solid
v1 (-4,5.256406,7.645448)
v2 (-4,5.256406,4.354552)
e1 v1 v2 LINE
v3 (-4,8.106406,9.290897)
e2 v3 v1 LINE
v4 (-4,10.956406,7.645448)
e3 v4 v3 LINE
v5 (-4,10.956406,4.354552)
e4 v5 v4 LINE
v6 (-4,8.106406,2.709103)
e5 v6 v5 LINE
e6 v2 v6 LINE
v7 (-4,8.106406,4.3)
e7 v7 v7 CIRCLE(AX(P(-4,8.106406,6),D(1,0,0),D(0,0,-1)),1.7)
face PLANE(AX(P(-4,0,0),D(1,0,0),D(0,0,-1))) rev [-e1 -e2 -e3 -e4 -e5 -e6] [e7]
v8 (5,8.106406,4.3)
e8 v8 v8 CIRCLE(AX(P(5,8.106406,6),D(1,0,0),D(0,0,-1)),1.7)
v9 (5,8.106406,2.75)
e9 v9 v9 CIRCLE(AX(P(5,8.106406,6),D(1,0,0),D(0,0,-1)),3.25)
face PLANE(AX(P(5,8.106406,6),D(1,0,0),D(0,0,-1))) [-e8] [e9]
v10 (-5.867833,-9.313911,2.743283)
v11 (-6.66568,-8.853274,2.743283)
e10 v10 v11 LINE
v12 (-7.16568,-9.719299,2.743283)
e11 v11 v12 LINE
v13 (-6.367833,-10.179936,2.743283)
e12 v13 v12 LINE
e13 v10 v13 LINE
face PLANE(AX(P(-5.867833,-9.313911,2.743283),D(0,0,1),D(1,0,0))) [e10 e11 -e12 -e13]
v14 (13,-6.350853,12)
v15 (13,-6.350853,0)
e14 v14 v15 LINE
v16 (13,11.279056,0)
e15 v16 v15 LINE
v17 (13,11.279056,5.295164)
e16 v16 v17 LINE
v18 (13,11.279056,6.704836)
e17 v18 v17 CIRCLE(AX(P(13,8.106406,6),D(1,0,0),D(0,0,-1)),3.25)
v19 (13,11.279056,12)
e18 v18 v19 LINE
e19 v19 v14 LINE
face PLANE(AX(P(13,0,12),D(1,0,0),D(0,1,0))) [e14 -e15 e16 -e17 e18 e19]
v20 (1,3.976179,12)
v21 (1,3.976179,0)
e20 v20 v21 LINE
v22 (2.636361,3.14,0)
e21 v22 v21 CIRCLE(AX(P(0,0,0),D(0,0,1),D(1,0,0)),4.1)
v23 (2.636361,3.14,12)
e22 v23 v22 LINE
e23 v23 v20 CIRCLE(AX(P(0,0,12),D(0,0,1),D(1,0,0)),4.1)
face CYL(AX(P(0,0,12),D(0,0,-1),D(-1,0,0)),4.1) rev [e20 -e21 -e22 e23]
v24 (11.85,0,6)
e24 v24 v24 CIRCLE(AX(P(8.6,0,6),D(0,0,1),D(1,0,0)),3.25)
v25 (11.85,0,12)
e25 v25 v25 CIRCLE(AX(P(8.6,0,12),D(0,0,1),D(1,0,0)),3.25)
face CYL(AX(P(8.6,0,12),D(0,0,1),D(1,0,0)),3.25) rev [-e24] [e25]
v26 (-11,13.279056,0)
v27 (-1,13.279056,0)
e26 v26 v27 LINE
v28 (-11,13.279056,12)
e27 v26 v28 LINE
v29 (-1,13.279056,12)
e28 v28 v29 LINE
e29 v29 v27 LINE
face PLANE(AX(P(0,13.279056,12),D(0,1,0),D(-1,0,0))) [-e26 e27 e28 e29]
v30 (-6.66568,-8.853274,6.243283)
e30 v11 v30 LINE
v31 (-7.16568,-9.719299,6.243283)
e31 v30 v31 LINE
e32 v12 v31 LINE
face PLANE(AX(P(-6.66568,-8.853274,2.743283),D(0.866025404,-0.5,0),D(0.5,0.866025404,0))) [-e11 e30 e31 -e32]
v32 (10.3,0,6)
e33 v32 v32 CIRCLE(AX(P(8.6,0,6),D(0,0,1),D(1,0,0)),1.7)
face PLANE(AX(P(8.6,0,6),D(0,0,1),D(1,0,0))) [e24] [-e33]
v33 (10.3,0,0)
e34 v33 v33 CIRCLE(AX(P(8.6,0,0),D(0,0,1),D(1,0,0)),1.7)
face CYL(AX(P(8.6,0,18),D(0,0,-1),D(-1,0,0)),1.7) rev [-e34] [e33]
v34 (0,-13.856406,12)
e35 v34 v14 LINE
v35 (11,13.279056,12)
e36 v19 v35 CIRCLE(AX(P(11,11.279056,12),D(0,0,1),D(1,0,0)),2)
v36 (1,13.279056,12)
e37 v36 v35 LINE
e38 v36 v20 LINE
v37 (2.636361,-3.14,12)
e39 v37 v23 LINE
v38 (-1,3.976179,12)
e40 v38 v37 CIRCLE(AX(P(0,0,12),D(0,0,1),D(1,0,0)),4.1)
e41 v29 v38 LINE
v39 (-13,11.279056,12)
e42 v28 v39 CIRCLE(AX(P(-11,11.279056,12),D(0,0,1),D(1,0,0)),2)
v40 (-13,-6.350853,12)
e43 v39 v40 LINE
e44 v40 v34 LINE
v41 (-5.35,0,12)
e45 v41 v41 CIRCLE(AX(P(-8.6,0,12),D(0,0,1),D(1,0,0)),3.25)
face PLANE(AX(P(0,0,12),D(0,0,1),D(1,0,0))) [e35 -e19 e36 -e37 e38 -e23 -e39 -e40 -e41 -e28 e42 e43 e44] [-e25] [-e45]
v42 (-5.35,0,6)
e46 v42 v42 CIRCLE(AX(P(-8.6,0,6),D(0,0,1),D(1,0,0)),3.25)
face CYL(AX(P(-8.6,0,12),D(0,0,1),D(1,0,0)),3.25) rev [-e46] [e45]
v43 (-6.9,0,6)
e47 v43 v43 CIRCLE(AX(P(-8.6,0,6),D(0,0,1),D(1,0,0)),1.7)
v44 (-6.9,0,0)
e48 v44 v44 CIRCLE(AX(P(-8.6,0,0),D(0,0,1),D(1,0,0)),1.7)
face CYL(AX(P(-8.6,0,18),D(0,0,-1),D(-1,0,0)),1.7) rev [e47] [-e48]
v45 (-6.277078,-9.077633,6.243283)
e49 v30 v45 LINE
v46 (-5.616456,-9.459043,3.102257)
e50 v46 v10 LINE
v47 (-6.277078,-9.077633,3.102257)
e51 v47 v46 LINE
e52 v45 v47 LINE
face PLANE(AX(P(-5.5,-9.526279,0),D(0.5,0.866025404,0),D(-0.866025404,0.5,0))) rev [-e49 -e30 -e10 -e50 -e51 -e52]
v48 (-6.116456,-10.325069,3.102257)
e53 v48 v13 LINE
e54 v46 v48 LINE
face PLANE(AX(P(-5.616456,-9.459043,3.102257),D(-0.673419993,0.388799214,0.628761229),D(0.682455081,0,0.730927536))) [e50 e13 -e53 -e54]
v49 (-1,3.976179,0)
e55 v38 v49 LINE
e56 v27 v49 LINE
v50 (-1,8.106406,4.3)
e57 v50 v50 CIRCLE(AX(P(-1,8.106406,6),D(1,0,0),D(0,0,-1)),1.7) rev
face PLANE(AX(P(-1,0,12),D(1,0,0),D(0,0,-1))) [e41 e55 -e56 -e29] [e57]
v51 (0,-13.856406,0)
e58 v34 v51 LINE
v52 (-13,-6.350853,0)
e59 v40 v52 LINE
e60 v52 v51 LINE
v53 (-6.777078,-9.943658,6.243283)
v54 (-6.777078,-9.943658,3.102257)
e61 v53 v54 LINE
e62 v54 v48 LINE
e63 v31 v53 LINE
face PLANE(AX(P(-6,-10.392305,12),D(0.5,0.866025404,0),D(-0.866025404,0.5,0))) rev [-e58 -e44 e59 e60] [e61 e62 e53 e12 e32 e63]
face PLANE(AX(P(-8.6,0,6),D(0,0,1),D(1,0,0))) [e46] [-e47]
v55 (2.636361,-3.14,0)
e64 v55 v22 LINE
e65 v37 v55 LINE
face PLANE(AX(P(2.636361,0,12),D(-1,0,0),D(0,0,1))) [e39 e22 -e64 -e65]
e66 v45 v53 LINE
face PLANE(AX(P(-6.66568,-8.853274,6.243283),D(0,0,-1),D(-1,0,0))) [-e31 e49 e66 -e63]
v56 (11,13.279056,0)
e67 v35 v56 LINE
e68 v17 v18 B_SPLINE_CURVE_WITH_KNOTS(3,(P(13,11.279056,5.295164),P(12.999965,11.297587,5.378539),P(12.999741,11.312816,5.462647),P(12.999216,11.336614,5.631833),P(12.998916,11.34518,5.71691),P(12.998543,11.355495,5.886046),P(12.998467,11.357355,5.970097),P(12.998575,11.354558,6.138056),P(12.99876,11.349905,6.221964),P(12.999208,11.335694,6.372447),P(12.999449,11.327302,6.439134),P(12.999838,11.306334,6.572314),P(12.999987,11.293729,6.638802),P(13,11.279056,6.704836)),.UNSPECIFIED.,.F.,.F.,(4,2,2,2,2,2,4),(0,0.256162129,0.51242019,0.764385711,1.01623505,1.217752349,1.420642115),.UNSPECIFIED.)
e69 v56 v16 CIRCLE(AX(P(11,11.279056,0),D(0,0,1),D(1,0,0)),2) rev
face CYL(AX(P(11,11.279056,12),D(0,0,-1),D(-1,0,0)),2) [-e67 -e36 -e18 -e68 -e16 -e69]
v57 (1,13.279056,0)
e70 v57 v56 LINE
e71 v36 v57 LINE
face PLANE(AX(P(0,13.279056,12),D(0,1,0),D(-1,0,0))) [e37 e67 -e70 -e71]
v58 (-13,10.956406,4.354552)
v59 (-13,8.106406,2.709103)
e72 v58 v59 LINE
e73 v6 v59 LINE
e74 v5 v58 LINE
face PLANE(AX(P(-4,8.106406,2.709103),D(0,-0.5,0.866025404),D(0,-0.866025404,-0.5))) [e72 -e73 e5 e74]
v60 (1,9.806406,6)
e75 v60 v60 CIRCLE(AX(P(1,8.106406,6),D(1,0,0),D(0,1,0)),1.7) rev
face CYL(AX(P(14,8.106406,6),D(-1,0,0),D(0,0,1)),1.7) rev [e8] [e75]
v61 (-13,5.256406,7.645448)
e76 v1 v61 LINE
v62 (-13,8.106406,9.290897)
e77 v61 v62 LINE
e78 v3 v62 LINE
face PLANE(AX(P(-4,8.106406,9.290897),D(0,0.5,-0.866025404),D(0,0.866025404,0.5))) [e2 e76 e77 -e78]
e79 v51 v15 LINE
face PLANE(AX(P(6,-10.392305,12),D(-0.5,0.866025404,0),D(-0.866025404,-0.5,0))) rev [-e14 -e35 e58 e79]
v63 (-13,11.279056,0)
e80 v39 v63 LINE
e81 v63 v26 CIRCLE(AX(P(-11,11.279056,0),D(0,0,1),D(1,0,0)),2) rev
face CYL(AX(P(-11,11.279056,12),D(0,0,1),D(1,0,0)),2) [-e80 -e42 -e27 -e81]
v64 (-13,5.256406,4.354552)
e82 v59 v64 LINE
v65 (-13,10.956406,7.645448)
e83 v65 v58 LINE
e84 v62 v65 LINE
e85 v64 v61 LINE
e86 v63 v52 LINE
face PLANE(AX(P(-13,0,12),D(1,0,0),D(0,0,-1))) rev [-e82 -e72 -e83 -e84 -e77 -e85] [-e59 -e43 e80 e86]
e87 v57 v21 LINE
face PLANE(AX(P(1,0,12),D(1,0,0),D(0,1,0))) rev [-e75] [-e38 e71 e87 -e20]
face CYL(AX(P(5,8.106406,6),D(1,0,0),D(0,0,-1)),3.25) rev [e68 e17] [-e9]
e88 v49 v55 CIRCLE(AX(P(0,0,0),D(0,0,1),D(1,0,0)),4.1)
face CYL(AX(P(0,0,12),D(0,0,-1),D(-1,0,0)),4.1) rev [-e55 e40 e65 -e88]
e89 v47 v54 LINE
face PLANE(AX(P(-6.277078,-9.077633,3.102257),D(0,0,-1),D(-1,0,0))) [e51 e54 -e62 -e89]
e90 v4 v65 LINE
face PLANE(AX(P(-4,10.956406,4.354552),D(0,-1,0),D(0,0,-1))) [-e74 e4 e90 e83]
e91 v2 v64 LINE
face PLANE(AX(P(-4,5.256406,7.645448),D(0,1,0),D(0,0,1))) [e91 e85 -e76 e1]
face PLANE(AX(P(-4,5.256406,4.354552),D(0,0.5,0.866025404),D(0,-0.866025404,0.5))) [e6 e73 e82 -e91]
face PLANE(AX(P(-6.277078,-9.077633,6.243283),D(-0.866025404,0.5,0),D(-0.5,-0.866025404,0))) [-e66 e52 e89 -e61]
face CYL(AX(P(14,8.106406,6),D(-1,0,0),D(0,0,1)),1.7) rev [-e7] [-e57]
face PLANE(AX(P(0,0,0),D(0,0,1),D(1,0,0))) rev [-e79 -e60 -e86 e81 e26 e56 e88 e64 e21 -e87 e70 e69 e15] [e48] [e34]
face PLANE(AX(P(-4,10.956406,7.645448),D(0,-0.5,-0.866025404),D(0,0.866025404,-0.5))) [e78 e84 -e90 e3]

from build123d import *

# Parameters (mm, degrees)
BOSS_EXTRUDE1_DEPTH            = 12
SKETCH41_R                     = 1.7
CUT_EXTRUDE7_DEPTH             = 18
CBORE_FOR_M3_SHCS1_D           = 3.4
CBORE_FOR_M3_SHCS1_CBORE_D     = 6.5
CBORE_FOR_M3_SHCS1_CBORE_DEPTH = 3
F_3DSKETCH3_START              = 9
F_3DSKETCH3_OUTLINE_R          = 3.25
F_3DSKETCH3_OUTLINE_R_2        = 1.7
F_3DSKETCH3_DEPTH              = 3
CUT_EXTRUDE10_DEPTH            = 15
CUT_EXTRUDE10_DEPTH_BACK       = 15
SKETCH52_R                     = 1.7
SKETCH58_R                     = 3.25
CUT_EXTRUDE11_DEPTH            = 8
CUT_EXTRUDE12_DEPTH            = 4
CUT_EXTRUDE12_DEPTH_BACK       = 6
FILLET1_R                      = 2
SKETCH61_R                     = 3.25
CUT_EXTRUDE13_DEPTH            = 6
CUT_EXTRUDE14_DEPTH            = 1


# Read off the part's stored shape, not the designer's step: 3DSketch3
with BuildPart() as part:
    # Sketch1 → Boss-Extrude1 (new body)
    with BuildSketch(Plane(origin=(0, 0, 0), x_dir=(0, 1, 0), z_dir=(0, 0, 1))):
        with BuildLine():
            Line((-6.350852961, -13), (13.279056191, -13))
            Line((13.279056191, -13), (13.279056191, -1))
            Line((13.279056191, -1), (3.97617907, -1))
            ThreePointArc((3.97617907, -1), (3.650947901, -1.865631106), (3.14, -2.636361129))
            Line((3.14, -2.636361129), (-3.14, -2.636361129))
            ThreePointArc((-3.14, -2.636361129), (-3.852531635, -1.402854233), (-4.1, 0))
            ThreePointArc((-4.1, 0), (-0.503818326, 4.06892702), (3.97617907, 1))
            Line((3.97617907, 1), (13.279056191, 1))
            Line((13.279056191, 1), (13.279056191, 13))
            Line((13.279056191, 13), (-6.350852961, 13))
            Line((-6.350852961, 13), (-13.856406461, 0))
            Line((-13.856406461, 0), (-6.350852961, -13))
        make_face()
    extrude(amount=BOSS_EXTRUDE1_DEPTH)

    # Sketch41 → Cut-Extrude7 (cut)
    with BuildSketch(Plane(origin=(0, 0, 0), x_dir=(0, 1, 0), z_dir=(0, 0, 1))):
        with Locations(Location((0, 8.6, 0), (0, 0, 270))):
            Circle(SKETCH41_R)
        with Locations(Location((0, -8.6, 0), (0, 0, 270))):
            Circle(SKETCH41_R)
    extrude(amount=CUT_EXTRUDE7_DEPTH, mode=Mode.SUBTRACT)

    # CBORE for M3 SHCS1 (through all)
    with Locations(Plane(origin=(-8.6, 0, 12), x_dir=(1, 0, 0), z_dir=(0, 0, 1))):
        with Locations((0, 0)):
            CounterBoreHole(CBORE_FOR_M3_SHCS1_D / 2, CBORE_FOR_M3_SHCS1_CBORE_D / 2, CBORE_FOR_M3_SHCS1_CBORE_DEPTH)

    # 3DSketch3 outline → 3DSketch3 (cut)
    with BuildSketch(Plane.XY.offset(F_3DSKETCH3_START)):
        with Locations((8.6, 0)):
            Circle(F_3DSKETCH3_OUTLINE_R)
        with Locations((8.6, 0)):
            Circle(F_3DSKETCH3_OUTLINE_R_2, mode=Mode.SUBTRACT)
    extrude(amount=F_3DSKETCH3_DEPTH, mode=Mode.SUBTRACT)

    # Sketch52 → Cut-Extrude10 (cut, two sides: drawn at the far end of the back side and taken through both)
    with BuildSketch(Plane.YZ.offset(-1).offset(-CUT_EXTRUDE10_DEPTH_BACK)):
        with Locations((8.106406461, 6)):
            Circle(SKETCH52_R)
    extrude(amount=CUT_EXTRUDE10_DEPTH + CUT_EXTRUDE10_DEPTH_BACK, mode=Mode.SUBTRACT)

    # Sketch58 → Cut-Extrude11 (cut)
    with BuildSketch(Plane.YZ.offset(13)):
        with Locations(Location((8.106406461, 6, 0), (0, 0, 270))):
            Circle(SKETCH58_R)
    extrude(amount=-CUT_EXTRUDE11_DEPTH, mode=Mode.SUBTRACT)

    # Sketch60 → Cut-Extrude12 (cut, two sides: drawn at the far end of the back side and taken through both)
    with BuildSketch(Plane.YZ.offset(-8).offset(-CUT_EXTRUDE12_DEPTH_BACK)):
        Polygon((8.106406461, 2.709103466), (10.956406461, 4.354551733), (10.956406461, 7.645448267), (8.106406461, 9.290896534), (5.256406461, 7.645448267), (5.256406461, 4.354551733), align=None)
    extrude(amount=CUT_EXTRUDE12_DEPTH + CUT_EXTRUDE12_DEPTH_BACK, mode=Mode.SUBTRACT)

    # Fillet1
    # the kernel refuses this fillet: 2 mm, written as the material it takes off along each edge
    with BuildSketch(Plane(origin=(13, 13.279056191, -5), x_dir=(0, -1, 0), z_dir=(0, 0, 1)), Plane(origin=(-13, 13.279056191, -5), x_dir=(1, 0, 0), z_dir=(0, 0, 1))) as fillet1_piece_1:
        with BuildLine():
            CenterArc((FILLET1_R, -FILLET1_R), FILLET1_R, 90, 90)
            Line((0, -FILLET1_R), (0, 0))
            Line((0, 0), (FILLET1_R, 0))
        make_face()
    extrude(amount=22, mode=Mode.SUBTRACT)

    # Sketch61 → Cut-Extrude13 (cut)
    with BuildSketch(Plane(origin=(0, 0, 12), x_dir=(0, 1, 0), z_dir=(0, 0, 1))):
        with Locations(Location((0, 8.6, 0), (0, 0, 270))):
            Circle(SKETCH61_R)
        with Locations(Location((0, -8.6, 0), (0, 0, 270))):
            Circle(SKETCH61_R)
    extrude(amount=-CUT_EXTRUDE13_DEPTH, mode=Mode.SUBTRACT)

    # Sketch62 → Cut-Extrude14 (cut)
    with BuildSketch(Plane(origin=(-6, -10.392304845, 0), x_dir=(-0.8660254037844386, 0.5000000000000001, 0), z_dir=(-0.5000000000000001, -0.8660254037844386, 0))):
        Polygon((0.424736725, -2.743282535), (1.346010764, -2.743282535), (1.346010764, -6.243282535), (0.897292815, -6.243282535), (0.897292815, -3.102256894), (0.134472302, -3.102256894), align=None)
    extrude(amount=-CUT_EXTRUDE14_DEPTH, mode=Mode.SUBTRACT)


solid = part.part
